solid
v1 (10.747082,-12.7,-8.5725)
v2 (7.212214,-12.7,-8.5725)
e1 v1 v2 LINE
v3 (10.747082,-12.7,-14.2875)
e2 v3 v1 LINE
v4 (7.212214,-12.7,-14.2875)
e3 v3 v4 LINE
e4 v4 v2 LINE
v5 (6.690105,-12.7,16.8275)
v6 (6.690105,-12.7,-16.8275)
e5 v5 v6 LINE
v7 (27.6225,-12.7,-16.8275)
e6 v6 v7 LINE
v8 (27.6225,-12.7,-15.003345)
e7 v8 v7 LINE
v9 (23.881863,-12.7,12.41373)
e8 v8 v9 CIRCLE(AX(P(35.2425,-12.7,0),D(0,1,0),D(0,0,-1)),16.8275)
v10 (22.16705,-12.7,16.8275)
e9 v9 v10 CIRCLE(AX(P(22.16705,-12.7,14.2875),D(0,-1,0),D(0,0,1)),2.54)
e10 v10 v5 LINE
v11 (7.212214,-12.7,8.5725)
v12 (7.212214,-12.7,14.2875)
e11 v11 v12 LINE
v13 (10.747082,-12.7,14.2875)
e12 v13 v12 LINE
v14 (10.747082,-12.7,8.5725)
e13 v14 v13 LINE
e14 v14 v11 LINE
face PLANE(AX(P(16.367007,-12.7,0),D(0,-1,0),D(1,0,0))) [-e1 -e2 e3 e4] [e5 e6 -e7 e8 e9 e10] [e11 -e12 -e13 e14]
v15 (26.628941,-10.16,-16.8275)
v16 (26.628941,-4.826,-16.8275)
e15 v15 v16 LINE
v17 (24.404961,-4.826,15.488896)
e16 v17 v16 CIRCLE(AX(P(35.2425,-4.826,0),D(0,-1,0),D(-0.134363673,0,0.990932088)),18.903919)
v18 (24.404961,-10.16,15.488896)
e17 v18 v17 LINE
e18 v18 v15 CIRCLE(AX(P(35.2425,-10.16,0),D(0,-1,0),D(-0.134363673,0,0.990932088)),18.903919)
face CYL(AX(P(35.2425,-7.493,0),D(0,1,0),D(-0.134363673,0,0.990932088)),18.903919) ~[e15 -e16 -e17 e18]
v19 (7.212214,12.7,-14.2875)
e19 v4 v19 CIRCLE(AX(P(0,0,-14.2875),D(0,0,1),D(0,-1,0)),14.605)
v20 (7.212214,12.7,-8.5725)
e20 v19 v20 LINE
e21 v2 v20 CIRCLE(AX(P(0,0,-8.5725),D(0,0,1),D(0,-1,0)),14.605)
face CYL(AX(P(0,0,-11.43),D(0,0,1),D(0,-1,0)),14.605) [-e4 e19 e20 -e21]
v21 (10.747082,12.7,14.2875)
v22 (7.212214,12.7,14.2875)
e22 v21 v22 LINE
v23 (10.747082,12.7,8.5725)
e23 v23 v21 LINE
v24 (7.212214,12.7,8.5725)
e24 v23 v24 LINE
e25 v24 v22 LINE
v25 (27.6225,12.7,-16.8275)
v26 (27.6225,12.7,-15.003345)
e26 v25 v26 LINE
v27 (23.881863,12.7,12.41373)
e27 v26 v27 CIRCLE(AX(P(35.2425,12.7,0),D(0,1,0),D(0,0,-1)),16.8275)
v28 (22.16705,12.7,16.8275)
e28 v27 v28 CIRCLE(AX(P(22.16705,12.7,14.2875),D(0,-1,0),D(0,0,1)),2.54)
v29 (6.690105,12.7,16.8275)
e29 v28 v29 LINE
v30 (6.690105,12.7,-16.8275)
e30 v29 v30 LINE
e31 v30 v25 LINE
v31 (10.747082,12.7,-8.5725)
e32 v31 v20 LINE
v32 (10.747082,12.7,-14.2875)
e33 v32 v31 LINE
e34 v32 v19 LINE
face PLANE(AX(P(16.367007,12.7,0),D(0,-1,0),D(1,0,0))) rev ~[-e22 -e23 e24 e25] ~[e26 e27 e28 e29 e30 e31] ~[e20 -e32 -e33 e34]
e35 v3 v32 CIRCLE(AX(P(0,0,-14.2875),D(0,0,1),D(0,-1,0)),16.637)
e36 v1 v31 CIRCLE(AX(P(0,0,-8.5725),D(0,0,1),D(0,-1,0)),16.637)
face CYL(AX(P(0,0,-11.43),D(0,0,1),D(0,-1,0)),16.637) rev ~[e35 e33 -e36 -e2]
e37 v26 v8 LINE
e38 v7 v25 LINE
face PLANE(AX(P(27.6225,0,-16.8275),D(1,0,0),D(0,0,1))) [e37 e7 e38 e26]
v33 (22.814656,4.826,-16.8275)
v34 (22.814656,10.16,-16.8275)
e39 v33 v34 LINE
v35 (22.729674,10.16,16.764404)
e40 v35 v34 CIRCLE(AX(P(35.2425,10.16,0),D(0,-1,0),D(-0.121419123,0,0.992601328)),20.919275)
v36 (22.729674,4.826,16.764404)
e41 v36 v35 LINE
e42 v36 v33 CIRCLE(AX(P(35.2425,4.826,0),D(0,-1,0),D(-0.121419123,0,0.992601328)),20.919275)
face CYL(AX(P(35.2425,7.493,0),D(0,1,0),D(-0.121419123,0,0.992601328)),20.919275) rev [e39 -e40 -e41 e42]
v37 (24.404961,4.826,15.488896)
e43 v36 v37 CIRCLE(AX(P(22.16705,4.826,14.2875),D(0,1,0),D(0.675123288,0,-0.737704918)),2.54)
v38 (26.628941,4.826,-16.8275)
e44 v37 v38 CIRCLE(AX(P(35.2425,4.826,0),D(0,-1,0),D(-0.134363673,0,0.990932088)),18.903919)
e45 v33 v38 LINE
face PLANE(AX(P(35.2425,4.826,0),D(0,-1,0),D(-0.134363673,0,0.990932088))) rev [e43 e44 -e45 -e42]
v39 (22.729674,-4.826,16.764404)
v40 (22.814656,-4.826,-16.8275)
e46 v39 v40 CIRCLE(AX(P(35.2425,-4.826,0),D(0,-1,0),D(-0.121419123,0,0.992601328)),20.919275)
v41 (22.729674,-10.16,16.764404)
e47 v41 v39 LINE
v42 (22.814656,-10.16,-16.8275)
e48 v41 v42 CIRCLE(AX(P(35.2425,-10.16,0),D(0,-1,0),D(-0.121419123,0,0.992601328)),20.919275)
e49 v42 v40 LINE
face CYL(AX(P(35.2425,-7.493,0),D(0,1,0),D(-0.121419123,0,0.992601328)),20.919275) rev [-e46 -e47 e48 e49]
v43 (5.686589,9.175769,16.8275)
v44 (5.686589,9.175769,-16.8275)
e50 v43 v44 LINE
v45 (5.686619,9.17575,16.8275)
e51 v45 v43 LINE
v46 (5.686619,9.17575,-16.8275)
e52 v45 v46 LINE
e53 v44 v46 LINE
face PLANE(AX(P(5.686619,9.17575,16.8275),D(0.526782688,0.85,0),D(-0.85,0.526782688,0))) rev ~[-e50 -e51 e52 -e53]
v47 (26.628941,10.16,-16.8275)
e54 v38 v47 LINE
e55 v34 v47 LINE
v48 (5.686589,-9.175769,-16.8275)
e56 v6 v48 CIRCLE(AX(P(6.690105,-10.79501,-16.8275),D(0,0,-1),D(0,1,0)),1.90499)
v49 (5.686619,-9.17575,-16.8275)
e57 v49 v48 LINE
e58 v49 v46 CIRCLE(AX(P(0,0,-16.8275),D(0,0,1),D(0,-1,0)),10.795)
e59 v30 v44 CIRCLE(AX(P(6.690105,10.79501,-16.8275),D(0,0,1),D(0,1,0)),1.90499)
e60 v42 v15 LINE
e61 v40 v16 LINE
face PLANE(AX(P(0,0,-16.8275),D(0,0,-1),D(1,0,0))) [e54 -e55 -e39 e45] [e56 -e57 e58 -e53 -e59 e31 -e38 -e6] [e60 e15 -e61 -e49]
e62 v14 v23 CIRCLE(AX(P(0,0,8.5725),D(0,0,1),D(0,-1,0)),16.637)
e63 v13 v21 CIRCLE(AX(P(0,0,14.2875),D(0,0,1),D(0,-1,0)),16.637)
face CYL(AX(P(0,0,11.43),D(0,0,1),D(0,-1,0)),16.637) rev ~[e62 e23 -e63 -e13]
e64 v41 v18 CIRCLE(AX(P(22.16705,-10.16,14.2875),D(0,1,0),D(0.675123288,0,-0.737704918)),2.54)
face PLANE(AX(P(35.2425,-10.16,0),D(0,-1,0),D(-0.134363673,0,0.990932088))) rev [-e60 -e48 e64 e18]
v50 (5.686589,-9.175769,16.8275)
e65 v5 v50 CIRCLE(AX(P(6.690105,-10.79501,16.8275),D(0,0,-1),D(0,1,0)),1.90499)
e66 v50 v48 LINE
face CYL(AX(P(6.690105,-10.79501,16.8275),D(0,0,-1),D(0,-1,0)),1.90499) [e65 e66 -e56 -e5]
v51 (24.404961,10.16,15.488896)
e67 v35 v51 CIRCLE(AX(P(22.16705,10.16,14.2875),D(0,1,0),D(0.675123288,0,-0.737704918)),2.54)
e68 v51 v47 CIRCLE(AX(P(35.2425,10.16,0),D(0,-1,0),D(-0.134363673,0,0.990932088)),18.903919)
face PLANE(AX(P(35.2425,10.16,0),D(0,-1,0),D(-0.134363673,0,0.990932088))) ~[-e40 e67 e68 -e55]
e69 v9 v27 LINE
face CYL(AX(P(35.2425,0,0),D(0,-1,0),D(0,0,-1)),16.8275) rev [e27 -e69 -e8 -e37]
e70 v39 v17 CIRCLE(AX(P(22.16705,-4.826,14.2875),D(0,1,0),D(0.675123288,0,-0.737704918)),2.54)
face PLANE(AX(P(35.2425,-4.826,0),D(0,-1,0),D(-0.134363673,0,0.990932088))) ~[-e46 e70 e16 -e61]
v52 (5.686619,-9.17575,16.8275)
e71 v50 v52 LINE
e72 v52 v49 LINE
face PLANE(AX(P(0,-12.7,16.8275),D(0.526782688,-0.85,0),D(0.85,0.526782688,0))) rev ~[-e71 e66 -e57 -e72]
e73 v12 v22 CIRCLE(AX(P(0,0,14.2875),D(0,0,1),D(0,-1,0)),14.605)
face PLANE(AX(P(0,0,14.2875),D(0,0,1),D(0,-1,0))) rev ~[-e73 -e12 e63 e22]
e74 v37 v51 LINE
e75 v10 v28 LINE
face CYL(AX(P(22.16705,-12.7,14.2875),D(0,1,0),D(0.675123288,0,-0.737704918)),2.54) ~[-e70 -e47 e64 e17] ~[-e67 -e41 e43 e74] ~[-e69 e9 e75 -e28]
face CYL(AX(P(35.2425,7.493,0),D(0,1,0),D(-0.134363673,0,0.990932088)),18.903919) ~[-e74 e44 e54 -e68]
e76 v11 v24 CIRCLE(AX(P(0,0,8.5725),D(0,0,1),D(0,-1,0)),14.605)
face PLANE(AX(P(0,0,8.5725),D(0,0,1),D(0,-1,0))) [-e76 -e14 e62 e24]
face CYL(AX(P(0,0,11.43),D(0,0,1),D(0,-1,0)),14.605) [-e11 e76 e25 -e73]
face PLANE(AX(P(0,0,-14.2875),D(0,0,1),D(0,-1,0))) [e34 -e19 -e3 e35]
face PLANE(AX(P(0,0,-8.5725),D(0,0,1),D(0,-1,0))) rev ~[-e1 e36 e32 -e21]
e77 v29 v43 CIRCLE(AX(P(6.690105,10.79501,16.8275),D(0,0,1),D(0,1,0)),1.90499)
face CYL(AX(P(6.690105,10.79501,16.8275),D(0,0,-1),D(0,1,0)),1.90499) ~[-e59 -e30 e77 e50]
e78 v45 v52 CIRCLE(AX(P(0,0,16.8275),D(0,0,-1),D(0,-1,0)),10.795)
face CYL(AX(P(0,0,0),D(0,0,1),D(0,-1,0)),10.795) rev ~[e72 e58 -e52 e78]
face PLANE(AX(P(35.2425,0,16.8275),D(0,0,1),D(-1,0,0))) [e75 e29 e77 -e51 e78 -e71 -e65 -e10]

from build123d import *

# Parameters (mm, degrees)
F1_DEPTH      = 12.7
F4_DEPTH      = 16.8285
F4_DEPTH_BACK = 16.8285
F5_R          = 2.54
F6_W          = 5.334
F6_H          = 2.032
F8_W          = 7.62
F8_H          = 2.54
F9_DEPTH      = 12.701
F9_DEPTH_BACK = 12.701
F10_W         = 2.032
F10_H         = 5.715
F13_DEPTH     = 33.656
F14_R         = 1.90499


# Not quite as in the source:
# - a fillet or chamfer is up to 0.001 mm smaller than in the source, because OpenCascade refuses the exact size


with BuildPart() as f1:
    # F0 (on Front) → F1 (new body, symmetric)
    with BuildSketch(Plane.XZ):
        with BuildLine():
            Line((0, 16.8275), (0, -16.8275))
            Line((0, -16.8275), (35.2425, -16.8275))
            ThreePointArc((35.2425, -16.8275), (18.415, 0), (35.2425, 16.8275))
            Line((35.2425, 16.8275), (0, 16.8275))
        make_face()
    extrude(amount=F1_DEPTH, both=True)

    # F3 (on Top) → F4 (cut, two sides)
    with BuildSketch(Plane.XY) as f4_sk:
        with BuildLine():
            Line((0, 10.795), (0, -10.795))
            ThreePointArc((0, -10.795), (10.795, 0), (0, 10.795))
        make_face()
    extrude(amount=-F4_DEPTH, mode=Mode.SUBTRACT)
    extrude(f4_sk.sketch, amount=F4_DEPTH_BACK, mode=Mode.SUBTRACT)

    # F5
    f5_edges = [f1.edges().sort_by_distance(p)[0] for p in [
        (35.2425, 0, 16.8275),
    ]]
    fillet(f5_edges, radius=F5_R)

    # F6 (on offset) → F7 (revolve, cut)
    with BuildSketch(Plane.YZ.offset(32.7025)):
        with Locations((7.493, 19.7485)):
            Rectangle(F6_W, F6_H)
        with Locations((-7.493, 19.7485)):
            Rectangle(F6_W, F6_H)
    revolve(axis=Axis((35.2425, 0, 0), (0, -1, 0)), mode=Mode.SUBTRACT)

    # F8 (on Front) → F9 (cut, two sides)
    with BuildSketch(Plane.XZ) as f9_sk:
        with Locations((31.4325, -15.5575)):
            Rectangle(F8_W, F8_H)
    extrude(amount=F9_DEPTH, mode=Mode.SUBTRACT)
    extrude(f9_sk.sketch, amount=-F9_DEPTH_BACK, mode=Mode.SUBTRACT)

    # F10 (on Right) → F11 (revolve, cut)
    with BuildSketch(Plane.YZ):
        with Locations((-15.621, 11.43)):
            Rectangle(F10_W, F10_H)
        with Locations((-15.621, -11.43)):
            Rectangle(F10_W, F10_H)
    revolve(axis=Axis((0, 0, 0), (0, 0, 1)), mode=Mode.SUBTRACT)

    # F12 (on face) → F13 (cut, through all)
    with BuildSketch(Plane.XY.offset(16.8275)):
        Polygon((5.6866191131, 9.17575), (0, 12.7), (0, 9.17575), align=None)
        Polygon((5.6866191131, -9.17575), (0, -9.17575), (0, -12.7), align=None)
    extrude(amount=-F13_DEPTH, mode=Mode.SUBTRACT)

    # F14 (radius 1.905 in the source; OpenCascade refuses exactly that, so slightly less here)
    f14_edges = [f1.edges().sort_by_distance(p)[0] for p in [
        (0, 12.7, 0),
        (0, -12.7, 0),
    ]]
    fillet(f14_edges, radius=F14_R)


solid = f1.part
